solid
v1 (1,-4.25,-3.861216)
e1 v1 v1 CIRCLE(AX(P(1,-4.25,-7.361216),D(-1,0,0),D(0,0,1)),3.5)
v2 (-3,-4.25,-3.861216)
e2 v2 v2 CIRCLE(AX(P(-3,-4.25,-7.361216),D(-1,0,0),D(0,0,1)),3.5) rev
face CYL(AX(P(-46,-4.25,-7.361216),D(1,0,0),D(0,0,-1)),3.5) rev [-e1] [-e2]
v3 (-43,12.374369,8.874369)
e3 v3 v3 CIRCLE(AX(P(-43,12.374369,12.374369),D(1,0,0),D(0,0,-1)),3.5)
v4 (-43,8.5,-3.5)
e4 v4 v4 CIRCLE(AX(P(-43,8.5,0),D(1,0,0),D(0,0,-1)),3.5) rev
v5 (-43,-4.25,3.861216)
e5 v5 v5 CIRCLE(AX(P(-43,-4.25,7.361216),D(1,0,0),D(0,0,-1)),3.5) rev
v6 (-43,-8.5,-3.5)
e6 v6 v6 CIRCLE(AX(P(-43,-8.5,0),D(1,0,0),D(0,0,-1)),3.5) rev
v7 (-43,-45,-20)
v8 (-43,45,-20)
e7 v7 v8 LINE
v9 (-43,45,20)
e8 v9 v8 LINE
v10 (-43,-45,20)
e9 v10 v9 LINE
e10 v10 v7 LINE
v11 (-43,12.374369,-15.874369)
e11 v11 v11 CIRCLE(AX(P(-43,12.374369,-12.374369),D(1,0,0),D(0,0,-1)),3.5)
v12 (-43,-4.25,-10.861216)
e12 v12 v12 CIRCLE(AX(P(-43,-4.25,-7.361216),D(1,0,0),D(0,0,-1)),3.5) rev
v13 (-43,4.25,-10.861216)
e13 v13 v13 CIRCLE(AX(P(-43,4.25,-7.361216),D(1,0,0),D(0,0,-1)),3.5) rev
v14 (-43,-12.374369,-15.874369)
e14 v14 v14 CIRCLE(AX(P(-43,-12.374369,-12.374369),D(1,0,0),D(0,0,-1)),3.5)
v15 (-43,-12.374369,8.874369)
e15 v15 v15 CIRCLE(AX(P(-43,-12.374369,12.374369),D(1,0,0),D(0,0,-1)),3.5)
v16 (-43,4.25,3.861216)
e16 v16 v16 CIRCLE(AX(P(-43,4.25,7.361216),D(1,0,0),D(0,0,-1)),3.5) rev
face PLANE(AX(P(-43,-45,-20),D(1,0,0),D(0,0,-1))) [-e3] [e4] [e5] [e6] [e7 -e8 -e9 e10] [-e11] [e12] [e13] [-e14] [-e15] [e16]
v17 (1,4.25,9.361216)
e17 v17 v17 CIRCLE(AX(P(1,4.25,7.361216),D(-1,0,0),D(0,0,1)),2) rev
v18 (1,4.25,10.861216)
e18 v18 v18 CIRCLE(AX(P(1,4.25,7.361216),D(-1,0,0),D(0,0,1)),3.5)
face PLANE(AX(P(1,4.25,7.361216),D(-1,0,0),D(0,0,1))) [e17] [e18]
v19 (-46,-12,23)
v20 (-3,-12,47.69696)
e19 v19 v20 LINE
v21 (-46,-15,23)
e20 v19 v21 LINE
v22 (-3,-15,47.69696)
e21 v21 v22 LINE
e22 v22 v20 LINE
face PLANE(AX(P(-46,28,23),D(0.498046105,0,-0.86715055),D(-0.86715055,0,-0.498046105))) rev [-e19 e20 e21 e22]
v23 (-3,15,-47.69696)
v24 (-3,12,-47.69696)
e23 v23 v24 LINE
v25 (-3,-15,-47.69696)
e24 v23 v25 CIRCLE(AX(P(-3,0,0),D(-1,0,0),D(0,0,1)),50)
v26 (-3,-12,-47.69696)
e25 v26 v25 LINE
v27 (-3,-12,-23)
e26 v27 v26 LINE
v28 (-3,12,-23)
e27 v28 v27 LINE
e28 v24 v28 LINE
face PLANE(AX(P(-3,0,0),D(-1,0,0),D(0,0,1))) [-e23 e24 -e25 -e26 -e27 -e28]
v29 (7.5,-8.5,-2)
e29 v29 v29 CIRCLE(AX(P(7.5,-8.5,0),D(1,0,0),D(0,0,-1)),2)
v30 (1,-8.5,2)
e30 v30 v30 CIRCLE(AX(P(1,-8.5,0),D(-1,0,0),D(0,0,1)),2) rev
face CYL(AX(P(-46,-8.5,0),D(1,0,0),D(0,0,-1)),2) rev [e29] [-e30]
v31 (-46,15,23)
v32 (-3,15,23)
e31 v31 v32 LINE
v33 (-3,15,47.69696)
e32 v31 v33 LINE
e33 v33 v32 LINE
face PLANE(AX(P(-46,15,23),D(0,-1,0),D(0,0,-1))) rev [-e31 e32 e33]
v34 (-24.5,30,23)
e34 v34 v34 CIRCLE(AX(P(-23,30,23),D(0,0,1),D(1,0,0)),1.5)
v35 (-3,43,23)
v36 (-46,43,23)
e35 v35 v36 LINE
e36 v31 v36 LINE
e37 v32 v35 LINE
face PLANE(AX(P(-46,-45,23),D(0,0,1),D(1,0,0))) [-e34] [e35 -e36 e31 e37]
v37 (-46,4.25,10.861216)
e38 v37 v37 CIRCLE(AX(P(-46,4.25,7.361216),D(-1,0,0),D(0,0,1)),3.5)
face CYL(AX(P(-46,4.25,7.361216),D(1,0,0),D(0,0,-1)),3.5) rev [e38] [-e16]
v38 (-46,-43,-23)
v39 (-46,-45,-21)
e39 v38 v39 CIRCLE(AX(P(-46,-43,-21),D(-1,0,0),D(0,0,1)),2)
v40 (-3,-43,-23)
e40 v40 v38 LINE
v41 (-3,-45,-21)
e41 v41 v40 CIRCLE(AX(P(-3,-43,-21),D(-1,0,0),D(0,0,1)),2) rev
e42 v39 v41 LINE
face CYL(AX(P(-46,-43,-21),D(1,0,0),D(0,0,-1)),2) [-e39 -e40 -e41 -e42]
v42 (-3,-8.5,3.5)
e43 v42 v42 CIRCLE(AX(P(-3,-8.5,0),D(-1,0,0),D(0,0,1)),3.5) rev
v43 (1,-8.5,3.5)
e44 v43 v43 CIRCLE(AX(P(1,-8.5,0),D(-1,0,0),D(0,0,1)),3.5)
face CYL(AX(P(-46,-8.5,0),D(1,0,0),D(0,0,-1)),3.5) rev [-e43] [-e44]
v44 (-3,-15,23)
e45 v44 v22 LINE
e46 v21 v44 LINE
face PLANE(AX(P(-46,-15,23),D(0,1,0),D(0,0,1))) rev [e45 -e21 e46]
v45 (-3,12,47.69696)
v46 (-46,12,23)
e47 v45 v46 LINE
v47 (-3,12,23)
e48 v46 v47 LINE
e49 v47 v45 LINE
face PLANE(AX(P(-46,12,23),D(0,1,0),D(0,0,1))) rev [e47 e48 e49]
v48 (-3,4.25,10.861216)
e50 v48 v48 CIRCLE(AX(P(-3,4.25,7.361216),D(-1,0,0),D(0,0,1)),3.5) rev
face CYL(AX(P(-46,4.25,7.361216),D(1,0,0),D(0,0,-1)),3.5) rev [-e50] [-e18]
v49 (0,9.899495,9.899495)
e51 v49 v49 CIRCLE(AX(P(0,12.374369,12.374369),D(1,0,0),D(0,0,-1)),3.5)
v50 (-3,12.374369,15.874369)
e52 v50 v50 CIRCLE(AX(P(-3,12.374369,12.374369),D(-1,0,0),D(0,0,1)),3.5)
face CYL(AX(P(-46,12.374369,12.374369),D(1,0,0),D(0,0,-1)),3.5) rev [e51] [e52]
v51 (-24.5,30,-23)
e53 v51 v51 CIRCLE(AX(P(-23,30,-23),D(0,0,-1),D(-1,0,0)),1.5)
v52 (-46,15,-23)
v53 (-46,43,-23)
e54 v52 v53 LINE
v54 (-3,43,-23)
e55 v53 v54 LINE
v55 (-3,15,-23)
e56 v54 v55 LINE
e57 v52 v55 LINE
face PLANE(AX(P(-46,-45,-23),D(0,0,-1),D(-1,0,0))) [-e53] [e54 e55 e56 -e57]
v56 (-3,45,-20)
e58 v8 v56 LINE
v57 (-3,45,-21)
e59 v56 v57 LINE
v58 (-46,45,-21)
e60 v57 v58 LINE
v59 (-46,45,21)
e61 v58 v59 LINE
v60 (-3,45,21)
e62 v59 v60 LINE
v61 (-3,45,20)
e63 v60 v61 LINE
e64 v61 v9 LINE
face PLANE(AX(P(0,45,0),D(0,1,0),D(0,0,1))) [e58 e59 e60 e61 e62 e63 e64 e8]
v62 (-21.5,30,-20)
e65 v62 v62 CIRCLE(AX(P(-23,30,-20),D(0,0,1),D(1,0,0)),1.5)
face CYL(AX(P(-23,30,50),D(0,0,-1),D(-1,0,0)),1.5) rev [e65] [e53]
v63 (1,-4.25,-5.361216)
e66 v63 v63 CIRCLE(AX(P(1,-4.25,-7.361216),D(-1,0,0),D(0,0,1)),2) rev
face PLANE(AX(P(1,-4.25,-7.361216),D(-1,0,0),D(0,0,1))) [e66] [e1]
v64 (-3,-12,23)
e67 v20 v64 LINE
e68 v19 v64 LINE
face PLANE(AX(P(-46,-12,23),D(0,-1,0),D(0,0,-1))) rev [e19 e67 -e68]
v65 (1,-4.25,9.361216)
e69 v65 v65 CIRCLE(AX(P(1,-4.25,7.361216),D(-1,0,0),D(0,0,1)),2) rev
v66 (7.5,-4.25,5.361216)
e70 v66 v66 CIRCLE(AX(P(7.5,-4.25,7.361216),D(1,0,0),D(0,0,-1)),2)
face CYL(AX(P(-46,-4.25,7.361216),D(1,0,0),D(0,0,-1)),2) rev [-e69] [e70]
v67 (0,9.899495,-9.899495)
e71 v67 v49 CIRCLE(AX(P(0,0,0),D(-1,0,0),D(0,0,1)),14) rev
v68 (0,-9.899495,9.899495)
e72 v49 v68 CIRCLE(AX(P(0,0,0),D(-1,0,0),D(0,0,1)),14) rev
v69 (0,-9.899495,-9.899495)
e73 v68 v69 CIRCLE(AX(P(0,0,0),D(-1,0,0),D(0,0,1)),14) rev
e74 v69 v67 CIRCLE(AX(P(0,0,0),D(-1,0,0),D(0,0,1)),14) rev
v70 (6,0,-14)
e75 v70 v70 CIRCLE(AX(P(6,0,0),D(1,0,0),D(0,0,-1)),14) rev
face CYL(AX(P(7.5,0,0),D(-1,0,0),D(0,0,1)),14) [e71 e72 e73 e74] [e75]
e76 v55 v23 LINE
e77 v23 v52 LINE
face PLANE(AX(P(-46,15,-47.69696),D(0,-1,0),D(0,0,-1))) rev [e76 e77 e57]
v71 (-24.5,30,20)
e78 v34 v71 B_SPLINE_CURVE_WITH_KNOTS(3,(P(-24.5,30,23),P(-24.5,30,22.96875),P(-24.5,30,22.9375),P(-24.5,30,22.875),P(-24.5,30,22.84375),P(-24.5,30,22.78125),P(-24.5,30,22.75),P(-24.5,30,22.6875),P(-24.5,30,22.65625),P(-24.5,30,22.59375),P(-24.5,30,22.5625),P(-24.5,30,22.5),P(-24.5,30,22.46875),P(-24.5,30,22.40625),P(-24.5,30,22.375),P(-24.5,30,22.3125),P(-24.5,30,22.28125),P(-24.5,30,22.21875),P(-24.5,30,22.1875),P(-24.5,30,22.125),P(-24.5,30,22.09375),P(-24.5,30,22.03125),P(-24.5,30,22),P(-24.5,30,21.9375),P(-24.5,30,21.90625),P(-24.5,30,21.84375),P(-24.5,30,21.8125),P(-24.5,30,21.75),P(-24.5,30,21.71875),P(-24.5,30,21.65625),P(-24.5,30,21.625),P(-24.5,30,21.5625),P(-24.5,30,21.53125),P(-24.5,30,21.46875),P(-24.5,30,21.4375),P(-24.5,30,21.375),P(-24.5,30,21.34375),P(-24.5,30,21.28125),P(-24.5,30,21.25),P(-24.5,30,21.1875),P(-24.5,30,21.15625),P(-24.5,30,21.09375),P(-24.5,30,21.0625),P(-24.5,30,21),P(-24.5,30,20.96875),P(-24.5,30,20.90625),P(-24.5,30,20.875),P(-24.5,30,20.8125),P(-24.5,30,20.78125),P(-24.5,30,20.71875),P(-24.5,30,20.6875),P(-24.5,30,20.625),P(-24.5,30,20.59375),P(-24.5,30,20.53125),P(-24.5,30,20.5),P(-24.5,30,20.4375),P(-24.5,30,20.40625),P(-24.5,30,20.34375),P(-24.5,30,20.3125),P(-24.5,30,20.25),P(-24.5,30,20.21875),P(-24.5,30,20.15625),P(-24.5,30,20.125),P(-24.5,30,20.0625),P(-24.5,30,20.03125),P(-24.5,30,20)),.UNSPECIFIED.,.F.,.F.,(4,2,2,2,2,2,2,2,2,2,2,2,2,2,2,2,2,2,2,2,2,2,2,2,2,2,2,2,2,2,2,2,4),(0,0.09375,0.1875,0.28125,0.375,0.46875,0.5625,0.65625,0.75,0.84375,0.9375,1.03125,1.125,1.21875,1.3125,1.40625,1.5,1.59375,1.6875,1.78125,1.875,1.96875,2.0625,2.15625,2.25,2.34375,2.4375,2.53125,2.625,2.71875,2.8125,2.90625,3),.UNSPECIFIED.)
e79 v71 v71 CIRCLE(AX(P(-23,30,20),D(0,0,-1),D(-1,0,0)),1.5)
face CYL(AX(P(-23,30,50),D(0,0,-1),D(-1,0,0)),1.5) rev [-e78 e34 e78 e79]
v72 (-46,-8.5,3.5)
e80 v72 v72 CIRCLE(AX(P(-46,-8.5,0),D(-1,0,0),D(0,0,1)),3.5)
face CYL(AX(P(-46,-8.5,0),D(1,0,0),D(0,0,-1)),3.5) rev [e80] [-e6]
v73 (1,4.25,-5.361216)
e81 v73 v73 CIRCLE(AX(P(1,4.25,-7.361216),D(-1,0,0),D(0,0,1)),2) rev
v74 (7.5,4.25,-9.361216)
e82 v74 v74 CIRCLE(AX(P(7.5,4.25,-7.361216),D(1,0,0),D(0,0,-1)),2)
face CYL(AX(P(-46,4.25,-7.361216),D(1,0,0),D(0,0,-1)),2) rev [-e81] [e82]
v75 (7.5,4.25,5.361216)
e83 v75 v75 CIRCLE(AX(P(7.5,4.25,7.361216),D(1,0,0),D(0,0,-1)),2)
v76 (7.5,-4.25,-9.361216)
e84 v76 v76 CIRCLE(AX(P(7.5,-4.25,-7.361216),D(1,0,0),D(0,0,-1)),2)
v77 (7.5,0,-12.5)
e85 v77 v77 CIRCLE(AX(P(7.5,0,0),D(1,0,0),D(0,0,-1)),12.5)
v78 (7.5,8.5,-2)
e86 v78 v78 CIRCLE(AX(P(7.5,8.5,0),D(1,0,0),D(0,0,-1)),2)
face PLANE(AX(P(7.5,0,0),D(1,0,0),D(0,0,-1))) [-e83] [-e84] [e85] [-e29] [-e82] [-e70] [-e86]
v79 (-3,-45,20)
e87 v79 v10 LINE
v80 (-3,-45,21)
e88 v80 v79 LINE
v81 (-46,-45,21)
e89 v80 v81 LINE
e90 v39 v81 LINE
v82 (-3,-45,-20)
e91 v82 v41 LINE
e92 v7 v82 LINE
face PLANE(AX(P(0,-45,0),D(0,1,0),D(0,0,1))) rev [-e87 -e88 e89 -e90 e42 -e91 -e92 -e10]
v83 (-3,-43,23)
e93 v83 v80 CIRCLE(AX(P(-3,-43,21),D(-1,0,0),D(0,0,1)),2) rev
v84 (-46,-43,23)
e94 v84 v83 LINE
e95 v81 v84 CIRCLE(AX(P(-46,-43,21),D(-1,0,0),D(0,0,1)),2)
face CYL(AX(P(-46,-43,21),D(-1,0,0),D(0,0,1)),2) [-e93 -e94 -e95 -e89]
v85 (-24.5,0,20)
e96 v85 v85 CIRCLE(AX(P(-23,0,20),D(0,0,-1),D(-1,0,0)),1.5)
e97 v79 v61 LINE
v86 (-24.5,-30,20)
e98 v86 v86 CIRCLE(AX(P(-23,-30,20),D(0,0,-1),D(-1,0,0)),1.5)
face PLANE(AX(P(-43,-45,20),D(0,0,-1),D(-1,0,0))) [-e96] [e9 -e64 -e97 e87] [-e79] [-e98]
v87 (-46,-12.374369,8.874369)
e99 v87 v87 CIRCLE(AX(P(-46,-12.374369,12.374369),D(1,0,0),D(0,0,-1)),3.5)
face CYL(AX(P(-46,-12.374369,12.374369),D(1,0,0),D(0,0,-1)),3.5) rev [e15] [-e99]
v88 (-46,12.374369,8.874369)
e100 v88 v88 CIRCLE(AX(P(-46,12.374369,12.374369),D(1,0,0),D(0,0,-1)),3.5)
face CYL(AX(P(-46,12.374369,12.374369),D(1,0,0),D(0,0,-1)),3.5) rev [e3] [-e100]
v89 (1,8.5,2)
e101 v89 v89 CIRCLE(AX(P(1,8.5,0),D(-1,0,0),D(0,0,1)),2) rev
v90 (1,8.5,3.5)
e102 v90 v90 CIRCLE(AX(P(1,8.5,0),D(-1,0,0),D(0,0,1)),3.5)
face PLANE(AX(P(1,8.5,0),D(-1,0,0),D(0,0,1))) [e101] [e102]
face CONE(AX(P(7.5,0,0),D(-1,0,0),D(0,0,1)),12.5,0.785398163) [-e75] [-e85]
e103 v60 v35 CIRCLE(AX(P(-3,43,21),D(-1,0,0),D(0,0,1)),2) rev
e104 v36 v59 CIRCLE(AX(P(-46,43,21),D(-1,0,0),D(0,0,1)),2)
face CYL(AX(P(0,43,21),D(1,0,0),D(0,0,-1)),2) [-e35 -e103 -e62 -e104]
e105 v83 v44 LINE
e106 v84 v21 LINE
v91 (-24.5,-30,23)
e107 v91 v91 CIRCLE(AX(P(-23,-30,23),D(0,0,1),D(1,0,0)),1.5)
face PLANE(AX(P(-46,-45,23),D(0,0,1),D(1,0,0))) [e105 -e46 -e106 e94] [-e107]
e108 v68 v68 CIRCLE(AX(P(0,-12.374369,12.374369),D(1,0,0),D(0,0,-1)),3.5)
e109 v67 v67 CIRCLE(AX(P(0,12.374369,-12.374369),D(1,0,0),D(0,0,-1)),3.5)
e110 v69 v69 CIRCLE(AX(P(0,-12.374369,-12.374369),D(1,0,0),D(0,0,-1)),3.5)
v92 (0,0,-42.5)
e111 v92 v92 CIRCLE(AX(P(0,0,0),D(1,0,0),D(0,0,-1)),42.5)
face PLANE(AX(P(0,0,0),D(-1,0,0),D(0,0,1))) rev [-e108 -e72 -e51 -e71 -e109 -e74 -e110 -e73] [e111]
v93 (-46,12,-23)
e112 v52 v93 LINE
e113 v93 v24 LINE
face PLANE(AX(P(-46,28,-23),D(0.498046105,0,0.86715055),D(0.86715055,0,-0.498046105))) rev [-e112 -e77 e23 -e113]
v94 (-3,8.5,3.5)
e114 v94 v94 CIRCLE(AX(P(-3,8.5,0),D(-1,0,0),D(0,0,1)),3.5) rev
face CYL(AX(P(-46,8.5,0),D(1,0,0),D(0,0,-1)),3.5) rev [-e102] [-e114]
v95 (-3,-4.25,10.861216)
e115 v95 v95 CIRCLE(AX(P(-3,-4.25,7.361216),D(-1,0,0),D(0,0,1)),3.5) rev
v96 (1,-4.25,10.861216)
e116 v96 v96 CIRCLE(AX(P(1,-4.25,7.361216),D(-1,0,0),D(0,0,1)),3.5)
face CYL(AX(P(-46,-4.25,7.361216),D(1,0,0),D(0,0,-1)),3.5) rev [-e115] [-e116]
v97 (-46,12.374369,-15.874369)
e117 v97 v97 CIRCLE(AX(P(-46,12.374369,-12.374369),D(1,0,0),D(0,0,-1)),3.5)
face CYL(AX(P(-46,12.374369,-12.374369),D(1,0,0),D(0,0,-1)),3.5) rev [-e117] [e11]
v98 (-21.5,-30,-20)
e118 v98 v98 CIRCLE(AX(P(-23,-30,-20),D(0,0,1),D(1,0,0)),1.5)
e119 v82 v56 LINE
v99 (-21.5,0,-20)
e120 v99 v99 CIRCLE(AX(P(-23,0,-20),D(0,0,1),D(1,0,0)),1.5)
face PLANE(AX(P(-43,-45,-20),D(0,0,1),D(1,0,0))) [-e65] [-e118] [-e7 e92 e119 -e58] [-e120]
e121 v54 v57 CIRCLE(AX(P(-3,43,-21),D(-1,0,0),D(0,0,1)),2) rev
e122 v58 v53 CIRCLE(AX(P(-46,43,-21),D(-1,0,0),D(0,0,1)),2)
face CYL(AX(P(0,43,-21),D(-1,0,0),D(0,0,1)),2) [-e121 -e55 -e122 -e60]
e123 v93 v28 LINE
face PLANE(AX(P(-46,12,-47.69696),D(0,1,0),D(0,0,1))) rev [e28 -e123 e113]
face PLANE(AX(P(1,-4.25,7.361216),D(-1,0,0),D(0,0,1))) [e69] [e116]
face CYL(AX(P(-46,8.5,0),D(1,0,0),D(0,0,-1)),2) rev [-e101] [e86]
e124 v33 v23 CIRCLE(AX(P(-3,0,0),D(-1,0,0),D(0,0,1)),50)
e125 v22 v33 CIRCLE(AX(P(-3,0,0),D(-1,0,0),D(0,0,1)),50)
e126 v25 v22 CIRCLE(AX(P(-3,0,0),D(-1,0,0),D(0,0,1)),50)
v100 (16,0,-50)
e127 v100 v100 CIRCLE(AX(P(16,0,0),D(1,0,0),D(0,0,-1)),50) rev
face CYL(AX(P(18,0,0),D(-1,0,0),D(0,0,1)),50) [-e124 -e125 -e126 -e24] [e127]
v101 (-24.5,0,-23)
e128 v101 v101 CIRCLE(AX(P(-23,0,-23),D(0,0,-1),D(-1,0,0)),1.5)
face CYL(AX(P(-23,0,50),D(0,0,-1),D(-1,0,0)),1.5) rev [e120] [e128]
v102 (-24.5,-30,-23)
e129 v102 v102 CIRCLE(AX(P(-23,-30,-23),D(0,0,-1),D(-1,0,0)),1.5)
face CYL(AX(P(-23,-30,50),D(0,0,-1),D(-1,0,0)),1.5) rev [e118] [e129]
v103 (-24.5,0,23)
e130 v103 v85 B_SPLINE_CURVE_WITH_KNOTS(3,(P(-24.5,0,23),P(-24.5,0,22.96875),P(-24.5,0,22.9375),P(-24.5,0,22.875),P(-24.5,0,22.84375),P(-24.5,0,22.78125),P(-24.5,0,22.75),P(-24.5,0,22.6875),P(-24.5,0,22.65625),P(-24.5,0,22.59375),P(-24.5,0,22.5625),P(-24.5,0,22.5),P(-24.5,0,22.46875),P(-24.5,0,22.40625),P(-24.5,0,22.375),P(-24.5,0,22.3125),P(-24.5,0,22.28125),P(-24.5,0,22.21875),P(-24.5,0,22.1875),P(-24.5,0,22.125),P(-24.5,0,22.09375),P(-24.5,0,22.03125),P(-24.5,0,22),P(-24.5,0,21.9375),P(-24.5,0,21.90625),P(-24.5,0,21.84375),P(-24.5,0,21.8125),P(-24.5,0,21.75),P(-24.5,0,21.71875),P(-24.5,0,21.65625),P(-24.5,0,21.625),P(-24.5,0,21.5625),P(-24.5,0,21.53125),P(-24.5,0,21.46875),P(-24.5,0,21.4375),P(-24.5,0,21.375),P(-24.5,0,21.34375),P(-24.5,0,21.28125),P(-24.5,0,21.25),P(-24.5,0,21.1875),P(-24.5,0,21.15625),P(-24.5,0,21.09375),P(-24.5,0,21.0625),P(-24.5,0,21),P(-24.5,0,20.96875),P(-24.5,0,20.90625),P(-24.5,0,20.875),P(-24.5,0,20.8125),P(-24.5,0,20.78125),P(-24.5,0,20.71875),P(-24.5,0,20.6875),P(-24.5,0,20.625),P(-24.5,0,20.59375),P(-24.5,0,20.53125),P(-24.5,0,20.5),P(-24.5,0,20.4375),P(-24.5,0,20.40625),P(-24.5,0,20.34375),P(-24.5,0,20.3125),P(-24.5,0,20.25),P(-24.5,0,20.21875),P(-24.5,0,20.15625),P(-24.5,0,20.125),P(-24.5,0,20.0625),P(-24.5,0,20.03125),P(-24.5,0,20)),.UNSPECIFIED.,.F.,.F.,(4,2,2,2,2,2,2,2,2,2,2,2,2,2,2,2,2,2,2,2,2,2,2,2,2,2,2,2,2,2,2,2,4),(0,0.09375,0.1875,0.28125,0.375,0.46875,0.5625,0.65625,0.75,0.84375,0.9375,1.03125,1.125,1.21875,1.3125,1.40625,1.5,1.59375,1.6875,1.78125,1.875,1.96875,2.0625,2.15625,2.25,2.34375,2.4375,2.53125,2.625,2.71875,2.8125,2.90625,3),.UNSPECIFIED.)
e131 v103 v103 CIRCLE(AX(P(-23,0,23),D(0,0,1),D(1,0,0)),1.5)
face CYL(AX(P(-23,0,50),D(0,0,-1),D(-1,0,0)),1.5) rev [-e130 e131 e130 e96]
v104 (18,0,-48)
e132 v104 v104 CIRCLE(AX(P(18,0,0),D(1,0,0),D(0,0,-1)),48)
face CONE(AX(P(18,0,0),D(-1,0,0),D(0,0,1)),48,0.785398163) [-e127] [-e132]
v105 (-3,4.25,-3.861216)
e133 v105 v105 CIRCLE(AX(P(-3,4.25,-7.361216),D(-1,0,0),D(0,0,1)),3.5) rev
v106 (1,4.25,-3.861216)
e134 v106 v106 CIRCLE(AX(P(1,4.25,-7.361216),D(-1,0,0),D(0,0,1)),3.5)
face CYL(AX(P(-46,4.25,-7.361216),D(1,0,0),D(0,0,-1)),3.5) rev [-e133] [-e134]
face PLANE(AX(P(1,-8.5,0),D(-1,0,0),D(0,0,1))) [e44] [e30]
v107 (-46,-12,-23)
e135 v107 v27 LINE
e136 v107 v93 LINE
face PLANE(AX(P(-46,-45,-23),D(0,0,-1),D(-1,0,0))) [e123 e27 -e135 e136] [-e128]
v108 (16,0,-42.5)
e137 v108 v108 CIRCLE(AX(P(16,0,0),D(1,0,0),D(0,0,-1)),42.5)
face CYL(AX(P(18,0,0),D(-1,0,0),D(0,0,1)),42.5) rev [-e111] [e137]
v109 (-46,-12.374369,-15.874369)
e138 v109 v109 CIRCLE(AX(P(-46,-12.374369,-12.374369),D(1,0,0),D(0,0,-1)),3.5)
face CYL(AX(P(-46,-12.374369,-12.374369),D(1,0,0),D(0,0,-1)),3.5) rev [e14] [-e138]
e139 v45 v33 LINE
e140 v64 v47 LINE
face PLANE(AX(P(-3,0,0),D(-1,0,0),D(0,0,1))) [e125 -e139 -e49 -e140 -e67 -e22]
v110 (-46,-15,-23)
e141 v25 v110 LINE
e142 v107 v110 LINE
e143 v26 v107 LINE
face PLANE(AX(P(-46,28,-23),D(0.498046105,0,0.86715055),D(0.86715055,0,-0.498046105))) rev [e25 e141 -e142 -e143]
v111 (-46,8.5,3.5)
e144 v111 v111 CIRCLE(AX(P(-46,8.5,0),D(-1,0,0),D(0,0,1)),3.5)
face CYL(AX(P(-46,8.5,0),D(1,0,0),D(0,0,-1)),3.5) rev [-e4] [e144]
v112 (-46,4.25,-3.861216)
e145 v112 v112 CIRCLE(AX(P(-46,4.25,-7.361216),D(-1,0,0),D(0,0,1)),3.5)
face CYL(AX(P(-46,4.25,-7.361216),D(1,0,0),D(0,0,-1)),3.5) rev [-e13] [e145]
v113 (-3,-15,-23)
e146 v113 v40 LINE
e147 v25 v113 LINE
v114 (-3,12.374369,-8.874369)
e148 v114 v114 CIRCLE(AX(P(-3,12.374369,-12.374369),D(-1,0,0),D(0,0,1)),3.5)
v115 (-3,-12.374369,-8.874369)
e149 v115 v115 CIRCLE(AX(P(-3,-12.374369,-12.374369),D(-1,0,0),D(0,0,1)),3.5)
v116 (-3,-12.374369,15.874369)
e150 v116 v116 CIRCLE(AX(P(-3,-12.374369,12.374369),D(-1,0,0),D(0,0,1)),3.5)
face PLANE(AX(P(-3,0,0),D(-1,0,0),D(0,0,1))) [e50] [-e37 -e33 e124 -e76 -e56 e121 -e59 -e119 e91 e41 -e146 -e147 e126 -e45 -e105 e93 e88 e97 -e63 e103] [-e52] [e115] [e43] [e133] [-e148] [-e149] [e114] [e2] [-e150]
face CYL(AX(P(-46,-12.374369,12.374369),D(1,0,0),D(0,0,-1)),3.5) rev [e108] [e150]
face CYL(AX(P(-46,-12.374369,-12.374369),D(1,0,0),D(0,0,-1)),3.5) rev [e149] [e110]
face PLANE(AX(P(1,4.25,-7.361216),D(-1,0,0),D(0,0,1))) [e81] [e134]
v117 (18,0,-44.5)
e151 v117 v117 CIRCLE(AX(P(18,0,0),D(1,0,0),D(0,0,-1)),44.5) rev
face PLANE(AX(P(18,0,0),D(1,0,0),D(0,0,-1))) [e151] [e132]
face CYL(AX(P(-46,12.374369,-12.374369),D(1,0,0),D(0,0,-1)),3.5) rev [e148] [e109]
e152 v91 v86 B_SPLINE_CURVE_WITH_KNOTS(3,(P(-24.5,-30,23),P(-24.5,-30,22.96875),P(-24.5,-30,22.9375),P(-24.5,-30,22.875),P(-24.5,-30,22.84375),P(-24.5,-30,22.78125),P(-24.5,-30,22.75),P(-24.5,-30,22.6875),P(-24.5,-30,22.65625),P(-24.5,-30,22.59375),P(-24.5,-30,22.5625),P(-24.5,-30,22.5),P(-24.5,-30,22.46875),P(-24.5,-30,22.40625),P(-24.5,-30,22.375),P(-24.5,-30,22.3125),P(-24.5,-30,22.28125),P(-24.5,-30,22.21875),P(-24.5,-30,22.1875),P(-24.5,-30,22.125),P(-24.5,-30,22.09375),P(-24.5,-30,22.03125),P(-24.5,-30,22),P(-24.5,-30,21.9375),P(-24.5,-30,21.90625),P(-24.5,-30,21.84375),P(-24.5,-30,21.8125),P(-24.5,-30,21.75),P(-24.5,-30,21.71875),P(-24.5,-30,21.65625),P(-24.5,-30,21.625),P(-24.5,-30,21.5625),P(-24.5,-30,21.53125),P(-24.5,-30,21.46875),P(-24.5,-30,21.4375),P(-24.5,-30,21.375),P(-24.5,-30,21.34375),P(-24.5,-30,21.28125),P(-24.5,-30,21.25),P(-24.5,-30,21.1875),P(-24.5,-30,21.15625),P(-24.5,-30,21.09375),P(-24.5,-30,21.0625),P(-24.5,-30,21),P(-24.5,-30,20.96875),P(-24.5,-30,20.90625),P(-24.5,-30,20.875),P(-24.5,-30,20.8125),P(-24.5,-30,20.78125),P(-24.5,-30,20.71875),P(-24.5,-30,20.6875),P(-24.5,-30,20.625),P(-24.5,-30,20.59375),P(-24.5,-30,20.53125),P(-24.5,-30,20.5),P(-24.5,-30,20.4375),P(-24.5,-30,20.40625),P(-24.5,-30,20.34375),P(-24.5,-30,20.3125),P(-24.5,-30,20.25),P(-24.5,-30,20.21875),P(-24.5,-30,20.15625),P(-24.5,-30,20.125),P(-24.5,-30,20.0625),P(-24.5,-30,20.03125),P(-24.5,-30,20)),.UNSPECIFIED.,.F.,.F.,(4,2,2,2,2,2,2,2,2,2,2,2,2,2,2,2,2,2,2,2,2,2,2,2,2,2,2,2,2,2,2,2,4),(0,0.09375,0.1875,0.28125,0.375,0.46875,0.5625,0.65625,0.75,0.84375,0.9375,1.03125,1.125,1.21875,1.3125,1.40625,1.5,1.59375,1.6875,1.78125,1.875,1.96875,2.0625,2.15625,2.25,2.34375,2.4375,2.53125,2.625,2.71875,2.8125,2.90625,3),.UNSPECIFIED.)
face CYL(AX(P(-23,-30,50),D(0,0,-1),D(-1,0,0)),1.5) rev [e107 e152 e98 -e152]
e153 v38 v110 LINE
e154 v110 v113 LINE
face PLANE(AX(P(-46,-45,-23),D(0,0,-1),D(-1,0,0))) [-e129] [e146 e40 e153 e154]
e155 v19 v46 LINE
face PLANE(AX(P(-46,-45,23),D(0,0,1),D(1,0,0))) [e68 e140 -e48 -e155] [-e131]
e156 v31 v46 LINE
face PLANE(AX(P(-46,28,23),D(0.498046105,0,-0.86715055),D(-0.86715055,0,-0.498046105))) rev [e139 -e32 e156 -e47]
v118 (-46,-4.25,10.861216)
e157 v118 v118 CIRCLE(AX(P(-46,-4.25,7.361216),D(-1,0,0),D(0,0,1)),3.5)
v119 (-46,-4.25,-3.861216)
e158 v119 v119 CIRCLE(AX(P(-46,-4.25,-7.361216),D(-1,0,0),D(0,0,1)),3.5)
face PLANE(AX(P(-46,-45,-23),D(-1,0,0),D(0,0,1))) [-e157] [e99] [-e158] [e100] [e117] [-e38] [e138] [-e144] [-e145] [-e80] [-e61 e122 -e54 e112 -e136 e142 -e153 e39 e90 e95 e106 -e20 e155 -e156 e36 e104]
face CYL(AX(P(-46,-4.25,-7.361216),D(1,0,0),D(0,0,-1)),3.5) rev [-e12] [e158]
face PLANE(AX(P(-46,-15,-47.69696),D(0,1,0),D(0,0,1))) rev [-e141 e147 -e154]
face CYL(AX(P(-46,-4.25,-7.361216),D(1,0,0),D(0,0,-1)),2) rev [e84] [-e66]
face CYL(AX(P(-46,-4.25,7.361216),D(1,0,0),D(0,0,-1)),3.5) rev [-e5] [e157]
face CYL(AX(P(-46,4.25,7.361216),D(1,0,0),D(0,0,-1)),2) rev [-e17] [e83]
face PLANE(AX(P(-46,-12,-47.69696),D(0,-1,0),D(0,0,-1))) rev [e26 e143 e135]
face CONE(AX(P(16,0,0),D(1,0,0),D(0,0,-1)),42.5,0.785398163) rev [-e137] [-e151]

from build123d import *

# Parameters (mm, degrees)
ESQUISSE3_R                  = 50
ESQUISSE3_R_2                = 42.5
BOSS_EXTRU_2_DEPTH           = 18
BOSS_EXTRU_3_START           = 3
ESQUISSE4_R                  = 50
BOSS_EXTRU_3_DEPTH           = 3
ESQUISSE5_R                  = 14
BOSS_EXTRU_4_DEPTH           = 7.5
BOSS_EXTRU_5_DEPTH           = 45
BOSS_EXTRU_5_DEPTH_BACK      = 45
CONG_1_R                     = 2
ESQUISSE6_R                  = 3.5
ENL_V_MAT_EXTRU_1_DEPTH      = 85.356386836
ESQUISSE7_R                  = 2
ENL_V_MAT_EXTRU_2_DEPTH      = 89.669329534
ENL_V_MAT_EXTRU_3_DEPTH      = 83.758685345
ENL_V_MAT_EXTRU_3_DEPTH_BACK = 4
ESQUISSE8_R                  = 3.5
ESQUISSE11_W                 = 24.696960071
ESQUISSE11_H                 = 3
BOSS_EXTRU_6_DEPTH           = 43
ENL_V_MAT_EXTRU_4_DEPTH      = 43
ESQUISSE13_R                 = 1.5
ENL_V_MAT_EXTRU_5_DEPTH      = 100.724620832
CHANFREIN1_SIZE              = 2
CHANFREIN2_SIZE              = 1.5


with BuildPart() as part:
    # Esquisse3 → Boss.-Extru.2 (new body)
    with BuildSketch(Plane(origin=(0, 0, 0), x_dir=(0, 0, -1), z_dir=(1, 0, 0))):
        Circle(ESQUISSE3_R)
        Circle(ESQUISSE3_R_2, mode=Mode.SUBTRACT)
    extrude(amount=BOSS_EXTRU_2_DEPTH)

    # Esquisse4 → Boss.-Extru.3 (add)
    with BuildSketch(Plane.ZY.offset(BOSS_EXTRU_3_START)):
        Circle(ESQUISSE4_R)
    extrude(amount=-BOSS_EXTRU_3_DEPTH)

    # Esquisse5 → Boss.-Extru.4 (add)
    with BuildSketch(Plane(origin=(0, 0, 0), x_dir=(0, 0, -1), z_dir=(1, 0, 0))):
        with Locations(Location((0, 0, 0), (0, 0, 180))):
            Circle(ESQUISSE5_R)
    extrude(amount=BOSS_EXTRU_4_DEPTH)

    # Esquisse10 → Boss.-Extru.5 (add, two sides: drawn at the far end of the back side and taken through both)
    with BuildSketch(Plane(origin=(0, 0, 0), x_dir=(1, 0, 0), z_dir=(0, 1, 0)).offset(-BOSS_EXTRU_5_DEPTH_BACK)):
        Polygon((-46, 23), (-3, 23), (-3, 20), (-43, 20), (-43, -20), (-3, -20), (-3, -23), (-46, -23), align=None)
    extrude(amount=BOSS_EXTRU_5_DEPTH + BOSS_EXTRU_5_DEPTH_BACK)

    # Congé1
    # the kernel refuses this fillet: 2 mm, written as the material it takes off along each edge
    with BuildSketch(Plane(origin=(-51, -45, -23), x_dir=(0, 0, 1), z_dir=(1, 0, 0)), Plane(origin=(-3, 45, 23), x_dir=(0, -1, 0), z_dir=(-1, 0, 0))) as cong_1_piece_1:
        with BuildLine():
            CenterArc((CONG_1_R, -CONG_1_R), CONG_1_R, 90, 90)
            Line((0, -CONG_1_R), (0, 0))
            Line((0, 0), (CONG_1_R, 0))
        make_face()
    extrude(amount=48, mode=Mode.SUBTRACT)
    with BuildSketch(Plane(origin=(-3, -45, 23), x_dir=(0, 1, 0), z_dir=(-1, 0, 0)), Plane(origin=(-51, 45, -23), x_dir=(0, 0, 1), z_dir=(1, 0, 0))) as cong_1_piece_2:
        with BuildLine():
            CenterArc((CONG_1_R, CONG_1_R), CONG_1_R, 180, 90)
            Line((0, CONG_1_R), (0, 0))
            Line((0, 0), (CONG_1_R, 0))
        make_face()
    extrude(amount=48, mode=Mode.SUBTRACT)

    # Esquisse6 → Enlèv. mat.-Extru.1 (cut, through all)
    with BuildSketch(Plane(origin=(0, 0, 0), x_dir=(0, 0, -1), z_dir=(1, 0, 0))):
        with Locations((-12.374368671, 12.374368671)):
            Circle(ESQUISSE6_R)
        with Locations((12.374368671, 12.374368671)):
            Circle(ESQUISSE6_R)
        with Locations((12.374368671, -12.374368671)):
            Circle(ESQUISSE6_R)
        with Locations((-12.374368671, -12.374368671)):
            Circle(ESQUISSE6_R)
    extrude(amount=-ENL_V_MAT_EXTRU_1_DEPTH, mode=Mode.SUBTRACT)

    # Esquisse7 → Enlèv. mat.-Extru.2 (cut, through all)
    with BuildSketch(Plane(origin=(7.5, 0, 0), x_dir=(0, 0, -1), z_dir=(1, 0, 0))):
        with Locations((0, 8.5)):
            Circle(ESQUISSE7_R)
        with Locations((7.361215932, 4.25)):
            Circle(ESQUISSE7_R)
        with Locations((7.361215932, -4.25)):
            Circle(ESQUISSE7_R)
        with Locations((0, -8.5)):
            Circle(ESQUISSE7_R)
        with Locations((-7.361215932, -4.25)):
            Circle(ESQUISSE7_R)
        with Locations((-7.361215932, 4.25)):
            Circle(ESQUISSE7_R)
    extrude(amount=-ENL_V_MAT_EXTRU_2_DEPTH, mode=Mode.SUBTRACT)

    # Esquisse8 → Enlèv. mat.-Extru.3 (cut, two sides: drawn at the far end of the back side and taken through both)
    with BuildSketch(Plane.ZY.offset(3).offset(-ENL_V_MAT_EXTRU_3_DEPTH_BACK)):
        with Locations((0, -8.5)):
            Circle(ESQUISSE8_R)
        with Locations((7.361215932, -4.25)):
            Circle(ESQUISSE8_R)
        with Locations((0, 8.5)):
            Circle(ESQUISSE8_R)
        with Locations((7.361215932, 4.25)):
            Circle(ESQUISSE8_R)
        with Locations((-7.361215932, -4.25)):
            Circle(ESQUISSE8_R)
        with Locations((-7.361215932, 4.25)):
            Circle(ESQUISSE8_R)
    extrude(amount=ENL_V_MAT_EXTRU_3_DEPTH + ENL_V_MAT_EXTRU_3_DEPTH_BACK, mode=Mode.SUBTRACT)

    # Esquisse11 → Boss.-Extru.6 (add)
    with BuildSketch(Plane.ZY.offset(3)):
        with Locations((35.348480036, 13.5)):
            Rectangle(ESQUISSE11_W, ESQUISSE11_H)
        with Locations((35.348480036, -13.5)):
            Rectangle(ESQUISSE11_W, ESQUISSE11_H)
        with Locations((-35.348480036, -13.5)):
            Rectangle(ESQUISSE11_W, ESQUISSE11_H)
        with Locations((-35.348480036, 13.5)):
            Rectangle(ESQUISSE11_W, ESQUISSE11_H)
    extrude(amount=BOSS_EXTRU_6_DEPTH)

    # Esquisse12 → Enlèv. mat.-Extru.4 (cut)
    with BuildSketch(Plane.XZ.offset(15)):
        Polygon((-46, -23), (-3, -47.696960071), (-46, -47.696960071), align=None)
        Polygon((-46, 23), (-3, 47.696960071), (-46, 47.696960071), align=None)
    extrude(amount=-ENL_V_MAT_EXTRU_4_DEPTH, mode=Mode.SUBTRACT)

    # Esquisse13 → Enlèv. mat.-Extru.5 (cut, through all)
    with BuildSketch(Plane(origin=(0, 0, -23), x_dir=(-1, 0, 0), z_dir=(0, 0, -1))):
        with Locations((23, 30)):
            Circle(ESQUISSE13_R)
        with Locations((23, -30)):
            Circle(ESQUISSE13_R)
        with Locations((23, 0)):
            Circle(ESQUISSE13_R)
    extrude(amount=-ENL_V_MAT_EXTRU_5_DEPTH, mode=Mode.SUBTRACT)

    # Chanfrein1
    chanfrein1_edges = [part.edges().sort_by_distance(p)[0] for p in [
        (18, 0, 50),
        (18, 0, 42.5),
    ]]
    chamfer(chanfrein1_edges, length=CHANFREIN1_SIZE)

    # Chanfrein2
    chanfrein2_edges = [part.edges().sort_by_distance(p)[0] for p in [
        (7.5, 0, -14),
    ]]
    chamfer(chanfrein2_edges, length=CHANFREIN2_SIZE)


solid = part.part
